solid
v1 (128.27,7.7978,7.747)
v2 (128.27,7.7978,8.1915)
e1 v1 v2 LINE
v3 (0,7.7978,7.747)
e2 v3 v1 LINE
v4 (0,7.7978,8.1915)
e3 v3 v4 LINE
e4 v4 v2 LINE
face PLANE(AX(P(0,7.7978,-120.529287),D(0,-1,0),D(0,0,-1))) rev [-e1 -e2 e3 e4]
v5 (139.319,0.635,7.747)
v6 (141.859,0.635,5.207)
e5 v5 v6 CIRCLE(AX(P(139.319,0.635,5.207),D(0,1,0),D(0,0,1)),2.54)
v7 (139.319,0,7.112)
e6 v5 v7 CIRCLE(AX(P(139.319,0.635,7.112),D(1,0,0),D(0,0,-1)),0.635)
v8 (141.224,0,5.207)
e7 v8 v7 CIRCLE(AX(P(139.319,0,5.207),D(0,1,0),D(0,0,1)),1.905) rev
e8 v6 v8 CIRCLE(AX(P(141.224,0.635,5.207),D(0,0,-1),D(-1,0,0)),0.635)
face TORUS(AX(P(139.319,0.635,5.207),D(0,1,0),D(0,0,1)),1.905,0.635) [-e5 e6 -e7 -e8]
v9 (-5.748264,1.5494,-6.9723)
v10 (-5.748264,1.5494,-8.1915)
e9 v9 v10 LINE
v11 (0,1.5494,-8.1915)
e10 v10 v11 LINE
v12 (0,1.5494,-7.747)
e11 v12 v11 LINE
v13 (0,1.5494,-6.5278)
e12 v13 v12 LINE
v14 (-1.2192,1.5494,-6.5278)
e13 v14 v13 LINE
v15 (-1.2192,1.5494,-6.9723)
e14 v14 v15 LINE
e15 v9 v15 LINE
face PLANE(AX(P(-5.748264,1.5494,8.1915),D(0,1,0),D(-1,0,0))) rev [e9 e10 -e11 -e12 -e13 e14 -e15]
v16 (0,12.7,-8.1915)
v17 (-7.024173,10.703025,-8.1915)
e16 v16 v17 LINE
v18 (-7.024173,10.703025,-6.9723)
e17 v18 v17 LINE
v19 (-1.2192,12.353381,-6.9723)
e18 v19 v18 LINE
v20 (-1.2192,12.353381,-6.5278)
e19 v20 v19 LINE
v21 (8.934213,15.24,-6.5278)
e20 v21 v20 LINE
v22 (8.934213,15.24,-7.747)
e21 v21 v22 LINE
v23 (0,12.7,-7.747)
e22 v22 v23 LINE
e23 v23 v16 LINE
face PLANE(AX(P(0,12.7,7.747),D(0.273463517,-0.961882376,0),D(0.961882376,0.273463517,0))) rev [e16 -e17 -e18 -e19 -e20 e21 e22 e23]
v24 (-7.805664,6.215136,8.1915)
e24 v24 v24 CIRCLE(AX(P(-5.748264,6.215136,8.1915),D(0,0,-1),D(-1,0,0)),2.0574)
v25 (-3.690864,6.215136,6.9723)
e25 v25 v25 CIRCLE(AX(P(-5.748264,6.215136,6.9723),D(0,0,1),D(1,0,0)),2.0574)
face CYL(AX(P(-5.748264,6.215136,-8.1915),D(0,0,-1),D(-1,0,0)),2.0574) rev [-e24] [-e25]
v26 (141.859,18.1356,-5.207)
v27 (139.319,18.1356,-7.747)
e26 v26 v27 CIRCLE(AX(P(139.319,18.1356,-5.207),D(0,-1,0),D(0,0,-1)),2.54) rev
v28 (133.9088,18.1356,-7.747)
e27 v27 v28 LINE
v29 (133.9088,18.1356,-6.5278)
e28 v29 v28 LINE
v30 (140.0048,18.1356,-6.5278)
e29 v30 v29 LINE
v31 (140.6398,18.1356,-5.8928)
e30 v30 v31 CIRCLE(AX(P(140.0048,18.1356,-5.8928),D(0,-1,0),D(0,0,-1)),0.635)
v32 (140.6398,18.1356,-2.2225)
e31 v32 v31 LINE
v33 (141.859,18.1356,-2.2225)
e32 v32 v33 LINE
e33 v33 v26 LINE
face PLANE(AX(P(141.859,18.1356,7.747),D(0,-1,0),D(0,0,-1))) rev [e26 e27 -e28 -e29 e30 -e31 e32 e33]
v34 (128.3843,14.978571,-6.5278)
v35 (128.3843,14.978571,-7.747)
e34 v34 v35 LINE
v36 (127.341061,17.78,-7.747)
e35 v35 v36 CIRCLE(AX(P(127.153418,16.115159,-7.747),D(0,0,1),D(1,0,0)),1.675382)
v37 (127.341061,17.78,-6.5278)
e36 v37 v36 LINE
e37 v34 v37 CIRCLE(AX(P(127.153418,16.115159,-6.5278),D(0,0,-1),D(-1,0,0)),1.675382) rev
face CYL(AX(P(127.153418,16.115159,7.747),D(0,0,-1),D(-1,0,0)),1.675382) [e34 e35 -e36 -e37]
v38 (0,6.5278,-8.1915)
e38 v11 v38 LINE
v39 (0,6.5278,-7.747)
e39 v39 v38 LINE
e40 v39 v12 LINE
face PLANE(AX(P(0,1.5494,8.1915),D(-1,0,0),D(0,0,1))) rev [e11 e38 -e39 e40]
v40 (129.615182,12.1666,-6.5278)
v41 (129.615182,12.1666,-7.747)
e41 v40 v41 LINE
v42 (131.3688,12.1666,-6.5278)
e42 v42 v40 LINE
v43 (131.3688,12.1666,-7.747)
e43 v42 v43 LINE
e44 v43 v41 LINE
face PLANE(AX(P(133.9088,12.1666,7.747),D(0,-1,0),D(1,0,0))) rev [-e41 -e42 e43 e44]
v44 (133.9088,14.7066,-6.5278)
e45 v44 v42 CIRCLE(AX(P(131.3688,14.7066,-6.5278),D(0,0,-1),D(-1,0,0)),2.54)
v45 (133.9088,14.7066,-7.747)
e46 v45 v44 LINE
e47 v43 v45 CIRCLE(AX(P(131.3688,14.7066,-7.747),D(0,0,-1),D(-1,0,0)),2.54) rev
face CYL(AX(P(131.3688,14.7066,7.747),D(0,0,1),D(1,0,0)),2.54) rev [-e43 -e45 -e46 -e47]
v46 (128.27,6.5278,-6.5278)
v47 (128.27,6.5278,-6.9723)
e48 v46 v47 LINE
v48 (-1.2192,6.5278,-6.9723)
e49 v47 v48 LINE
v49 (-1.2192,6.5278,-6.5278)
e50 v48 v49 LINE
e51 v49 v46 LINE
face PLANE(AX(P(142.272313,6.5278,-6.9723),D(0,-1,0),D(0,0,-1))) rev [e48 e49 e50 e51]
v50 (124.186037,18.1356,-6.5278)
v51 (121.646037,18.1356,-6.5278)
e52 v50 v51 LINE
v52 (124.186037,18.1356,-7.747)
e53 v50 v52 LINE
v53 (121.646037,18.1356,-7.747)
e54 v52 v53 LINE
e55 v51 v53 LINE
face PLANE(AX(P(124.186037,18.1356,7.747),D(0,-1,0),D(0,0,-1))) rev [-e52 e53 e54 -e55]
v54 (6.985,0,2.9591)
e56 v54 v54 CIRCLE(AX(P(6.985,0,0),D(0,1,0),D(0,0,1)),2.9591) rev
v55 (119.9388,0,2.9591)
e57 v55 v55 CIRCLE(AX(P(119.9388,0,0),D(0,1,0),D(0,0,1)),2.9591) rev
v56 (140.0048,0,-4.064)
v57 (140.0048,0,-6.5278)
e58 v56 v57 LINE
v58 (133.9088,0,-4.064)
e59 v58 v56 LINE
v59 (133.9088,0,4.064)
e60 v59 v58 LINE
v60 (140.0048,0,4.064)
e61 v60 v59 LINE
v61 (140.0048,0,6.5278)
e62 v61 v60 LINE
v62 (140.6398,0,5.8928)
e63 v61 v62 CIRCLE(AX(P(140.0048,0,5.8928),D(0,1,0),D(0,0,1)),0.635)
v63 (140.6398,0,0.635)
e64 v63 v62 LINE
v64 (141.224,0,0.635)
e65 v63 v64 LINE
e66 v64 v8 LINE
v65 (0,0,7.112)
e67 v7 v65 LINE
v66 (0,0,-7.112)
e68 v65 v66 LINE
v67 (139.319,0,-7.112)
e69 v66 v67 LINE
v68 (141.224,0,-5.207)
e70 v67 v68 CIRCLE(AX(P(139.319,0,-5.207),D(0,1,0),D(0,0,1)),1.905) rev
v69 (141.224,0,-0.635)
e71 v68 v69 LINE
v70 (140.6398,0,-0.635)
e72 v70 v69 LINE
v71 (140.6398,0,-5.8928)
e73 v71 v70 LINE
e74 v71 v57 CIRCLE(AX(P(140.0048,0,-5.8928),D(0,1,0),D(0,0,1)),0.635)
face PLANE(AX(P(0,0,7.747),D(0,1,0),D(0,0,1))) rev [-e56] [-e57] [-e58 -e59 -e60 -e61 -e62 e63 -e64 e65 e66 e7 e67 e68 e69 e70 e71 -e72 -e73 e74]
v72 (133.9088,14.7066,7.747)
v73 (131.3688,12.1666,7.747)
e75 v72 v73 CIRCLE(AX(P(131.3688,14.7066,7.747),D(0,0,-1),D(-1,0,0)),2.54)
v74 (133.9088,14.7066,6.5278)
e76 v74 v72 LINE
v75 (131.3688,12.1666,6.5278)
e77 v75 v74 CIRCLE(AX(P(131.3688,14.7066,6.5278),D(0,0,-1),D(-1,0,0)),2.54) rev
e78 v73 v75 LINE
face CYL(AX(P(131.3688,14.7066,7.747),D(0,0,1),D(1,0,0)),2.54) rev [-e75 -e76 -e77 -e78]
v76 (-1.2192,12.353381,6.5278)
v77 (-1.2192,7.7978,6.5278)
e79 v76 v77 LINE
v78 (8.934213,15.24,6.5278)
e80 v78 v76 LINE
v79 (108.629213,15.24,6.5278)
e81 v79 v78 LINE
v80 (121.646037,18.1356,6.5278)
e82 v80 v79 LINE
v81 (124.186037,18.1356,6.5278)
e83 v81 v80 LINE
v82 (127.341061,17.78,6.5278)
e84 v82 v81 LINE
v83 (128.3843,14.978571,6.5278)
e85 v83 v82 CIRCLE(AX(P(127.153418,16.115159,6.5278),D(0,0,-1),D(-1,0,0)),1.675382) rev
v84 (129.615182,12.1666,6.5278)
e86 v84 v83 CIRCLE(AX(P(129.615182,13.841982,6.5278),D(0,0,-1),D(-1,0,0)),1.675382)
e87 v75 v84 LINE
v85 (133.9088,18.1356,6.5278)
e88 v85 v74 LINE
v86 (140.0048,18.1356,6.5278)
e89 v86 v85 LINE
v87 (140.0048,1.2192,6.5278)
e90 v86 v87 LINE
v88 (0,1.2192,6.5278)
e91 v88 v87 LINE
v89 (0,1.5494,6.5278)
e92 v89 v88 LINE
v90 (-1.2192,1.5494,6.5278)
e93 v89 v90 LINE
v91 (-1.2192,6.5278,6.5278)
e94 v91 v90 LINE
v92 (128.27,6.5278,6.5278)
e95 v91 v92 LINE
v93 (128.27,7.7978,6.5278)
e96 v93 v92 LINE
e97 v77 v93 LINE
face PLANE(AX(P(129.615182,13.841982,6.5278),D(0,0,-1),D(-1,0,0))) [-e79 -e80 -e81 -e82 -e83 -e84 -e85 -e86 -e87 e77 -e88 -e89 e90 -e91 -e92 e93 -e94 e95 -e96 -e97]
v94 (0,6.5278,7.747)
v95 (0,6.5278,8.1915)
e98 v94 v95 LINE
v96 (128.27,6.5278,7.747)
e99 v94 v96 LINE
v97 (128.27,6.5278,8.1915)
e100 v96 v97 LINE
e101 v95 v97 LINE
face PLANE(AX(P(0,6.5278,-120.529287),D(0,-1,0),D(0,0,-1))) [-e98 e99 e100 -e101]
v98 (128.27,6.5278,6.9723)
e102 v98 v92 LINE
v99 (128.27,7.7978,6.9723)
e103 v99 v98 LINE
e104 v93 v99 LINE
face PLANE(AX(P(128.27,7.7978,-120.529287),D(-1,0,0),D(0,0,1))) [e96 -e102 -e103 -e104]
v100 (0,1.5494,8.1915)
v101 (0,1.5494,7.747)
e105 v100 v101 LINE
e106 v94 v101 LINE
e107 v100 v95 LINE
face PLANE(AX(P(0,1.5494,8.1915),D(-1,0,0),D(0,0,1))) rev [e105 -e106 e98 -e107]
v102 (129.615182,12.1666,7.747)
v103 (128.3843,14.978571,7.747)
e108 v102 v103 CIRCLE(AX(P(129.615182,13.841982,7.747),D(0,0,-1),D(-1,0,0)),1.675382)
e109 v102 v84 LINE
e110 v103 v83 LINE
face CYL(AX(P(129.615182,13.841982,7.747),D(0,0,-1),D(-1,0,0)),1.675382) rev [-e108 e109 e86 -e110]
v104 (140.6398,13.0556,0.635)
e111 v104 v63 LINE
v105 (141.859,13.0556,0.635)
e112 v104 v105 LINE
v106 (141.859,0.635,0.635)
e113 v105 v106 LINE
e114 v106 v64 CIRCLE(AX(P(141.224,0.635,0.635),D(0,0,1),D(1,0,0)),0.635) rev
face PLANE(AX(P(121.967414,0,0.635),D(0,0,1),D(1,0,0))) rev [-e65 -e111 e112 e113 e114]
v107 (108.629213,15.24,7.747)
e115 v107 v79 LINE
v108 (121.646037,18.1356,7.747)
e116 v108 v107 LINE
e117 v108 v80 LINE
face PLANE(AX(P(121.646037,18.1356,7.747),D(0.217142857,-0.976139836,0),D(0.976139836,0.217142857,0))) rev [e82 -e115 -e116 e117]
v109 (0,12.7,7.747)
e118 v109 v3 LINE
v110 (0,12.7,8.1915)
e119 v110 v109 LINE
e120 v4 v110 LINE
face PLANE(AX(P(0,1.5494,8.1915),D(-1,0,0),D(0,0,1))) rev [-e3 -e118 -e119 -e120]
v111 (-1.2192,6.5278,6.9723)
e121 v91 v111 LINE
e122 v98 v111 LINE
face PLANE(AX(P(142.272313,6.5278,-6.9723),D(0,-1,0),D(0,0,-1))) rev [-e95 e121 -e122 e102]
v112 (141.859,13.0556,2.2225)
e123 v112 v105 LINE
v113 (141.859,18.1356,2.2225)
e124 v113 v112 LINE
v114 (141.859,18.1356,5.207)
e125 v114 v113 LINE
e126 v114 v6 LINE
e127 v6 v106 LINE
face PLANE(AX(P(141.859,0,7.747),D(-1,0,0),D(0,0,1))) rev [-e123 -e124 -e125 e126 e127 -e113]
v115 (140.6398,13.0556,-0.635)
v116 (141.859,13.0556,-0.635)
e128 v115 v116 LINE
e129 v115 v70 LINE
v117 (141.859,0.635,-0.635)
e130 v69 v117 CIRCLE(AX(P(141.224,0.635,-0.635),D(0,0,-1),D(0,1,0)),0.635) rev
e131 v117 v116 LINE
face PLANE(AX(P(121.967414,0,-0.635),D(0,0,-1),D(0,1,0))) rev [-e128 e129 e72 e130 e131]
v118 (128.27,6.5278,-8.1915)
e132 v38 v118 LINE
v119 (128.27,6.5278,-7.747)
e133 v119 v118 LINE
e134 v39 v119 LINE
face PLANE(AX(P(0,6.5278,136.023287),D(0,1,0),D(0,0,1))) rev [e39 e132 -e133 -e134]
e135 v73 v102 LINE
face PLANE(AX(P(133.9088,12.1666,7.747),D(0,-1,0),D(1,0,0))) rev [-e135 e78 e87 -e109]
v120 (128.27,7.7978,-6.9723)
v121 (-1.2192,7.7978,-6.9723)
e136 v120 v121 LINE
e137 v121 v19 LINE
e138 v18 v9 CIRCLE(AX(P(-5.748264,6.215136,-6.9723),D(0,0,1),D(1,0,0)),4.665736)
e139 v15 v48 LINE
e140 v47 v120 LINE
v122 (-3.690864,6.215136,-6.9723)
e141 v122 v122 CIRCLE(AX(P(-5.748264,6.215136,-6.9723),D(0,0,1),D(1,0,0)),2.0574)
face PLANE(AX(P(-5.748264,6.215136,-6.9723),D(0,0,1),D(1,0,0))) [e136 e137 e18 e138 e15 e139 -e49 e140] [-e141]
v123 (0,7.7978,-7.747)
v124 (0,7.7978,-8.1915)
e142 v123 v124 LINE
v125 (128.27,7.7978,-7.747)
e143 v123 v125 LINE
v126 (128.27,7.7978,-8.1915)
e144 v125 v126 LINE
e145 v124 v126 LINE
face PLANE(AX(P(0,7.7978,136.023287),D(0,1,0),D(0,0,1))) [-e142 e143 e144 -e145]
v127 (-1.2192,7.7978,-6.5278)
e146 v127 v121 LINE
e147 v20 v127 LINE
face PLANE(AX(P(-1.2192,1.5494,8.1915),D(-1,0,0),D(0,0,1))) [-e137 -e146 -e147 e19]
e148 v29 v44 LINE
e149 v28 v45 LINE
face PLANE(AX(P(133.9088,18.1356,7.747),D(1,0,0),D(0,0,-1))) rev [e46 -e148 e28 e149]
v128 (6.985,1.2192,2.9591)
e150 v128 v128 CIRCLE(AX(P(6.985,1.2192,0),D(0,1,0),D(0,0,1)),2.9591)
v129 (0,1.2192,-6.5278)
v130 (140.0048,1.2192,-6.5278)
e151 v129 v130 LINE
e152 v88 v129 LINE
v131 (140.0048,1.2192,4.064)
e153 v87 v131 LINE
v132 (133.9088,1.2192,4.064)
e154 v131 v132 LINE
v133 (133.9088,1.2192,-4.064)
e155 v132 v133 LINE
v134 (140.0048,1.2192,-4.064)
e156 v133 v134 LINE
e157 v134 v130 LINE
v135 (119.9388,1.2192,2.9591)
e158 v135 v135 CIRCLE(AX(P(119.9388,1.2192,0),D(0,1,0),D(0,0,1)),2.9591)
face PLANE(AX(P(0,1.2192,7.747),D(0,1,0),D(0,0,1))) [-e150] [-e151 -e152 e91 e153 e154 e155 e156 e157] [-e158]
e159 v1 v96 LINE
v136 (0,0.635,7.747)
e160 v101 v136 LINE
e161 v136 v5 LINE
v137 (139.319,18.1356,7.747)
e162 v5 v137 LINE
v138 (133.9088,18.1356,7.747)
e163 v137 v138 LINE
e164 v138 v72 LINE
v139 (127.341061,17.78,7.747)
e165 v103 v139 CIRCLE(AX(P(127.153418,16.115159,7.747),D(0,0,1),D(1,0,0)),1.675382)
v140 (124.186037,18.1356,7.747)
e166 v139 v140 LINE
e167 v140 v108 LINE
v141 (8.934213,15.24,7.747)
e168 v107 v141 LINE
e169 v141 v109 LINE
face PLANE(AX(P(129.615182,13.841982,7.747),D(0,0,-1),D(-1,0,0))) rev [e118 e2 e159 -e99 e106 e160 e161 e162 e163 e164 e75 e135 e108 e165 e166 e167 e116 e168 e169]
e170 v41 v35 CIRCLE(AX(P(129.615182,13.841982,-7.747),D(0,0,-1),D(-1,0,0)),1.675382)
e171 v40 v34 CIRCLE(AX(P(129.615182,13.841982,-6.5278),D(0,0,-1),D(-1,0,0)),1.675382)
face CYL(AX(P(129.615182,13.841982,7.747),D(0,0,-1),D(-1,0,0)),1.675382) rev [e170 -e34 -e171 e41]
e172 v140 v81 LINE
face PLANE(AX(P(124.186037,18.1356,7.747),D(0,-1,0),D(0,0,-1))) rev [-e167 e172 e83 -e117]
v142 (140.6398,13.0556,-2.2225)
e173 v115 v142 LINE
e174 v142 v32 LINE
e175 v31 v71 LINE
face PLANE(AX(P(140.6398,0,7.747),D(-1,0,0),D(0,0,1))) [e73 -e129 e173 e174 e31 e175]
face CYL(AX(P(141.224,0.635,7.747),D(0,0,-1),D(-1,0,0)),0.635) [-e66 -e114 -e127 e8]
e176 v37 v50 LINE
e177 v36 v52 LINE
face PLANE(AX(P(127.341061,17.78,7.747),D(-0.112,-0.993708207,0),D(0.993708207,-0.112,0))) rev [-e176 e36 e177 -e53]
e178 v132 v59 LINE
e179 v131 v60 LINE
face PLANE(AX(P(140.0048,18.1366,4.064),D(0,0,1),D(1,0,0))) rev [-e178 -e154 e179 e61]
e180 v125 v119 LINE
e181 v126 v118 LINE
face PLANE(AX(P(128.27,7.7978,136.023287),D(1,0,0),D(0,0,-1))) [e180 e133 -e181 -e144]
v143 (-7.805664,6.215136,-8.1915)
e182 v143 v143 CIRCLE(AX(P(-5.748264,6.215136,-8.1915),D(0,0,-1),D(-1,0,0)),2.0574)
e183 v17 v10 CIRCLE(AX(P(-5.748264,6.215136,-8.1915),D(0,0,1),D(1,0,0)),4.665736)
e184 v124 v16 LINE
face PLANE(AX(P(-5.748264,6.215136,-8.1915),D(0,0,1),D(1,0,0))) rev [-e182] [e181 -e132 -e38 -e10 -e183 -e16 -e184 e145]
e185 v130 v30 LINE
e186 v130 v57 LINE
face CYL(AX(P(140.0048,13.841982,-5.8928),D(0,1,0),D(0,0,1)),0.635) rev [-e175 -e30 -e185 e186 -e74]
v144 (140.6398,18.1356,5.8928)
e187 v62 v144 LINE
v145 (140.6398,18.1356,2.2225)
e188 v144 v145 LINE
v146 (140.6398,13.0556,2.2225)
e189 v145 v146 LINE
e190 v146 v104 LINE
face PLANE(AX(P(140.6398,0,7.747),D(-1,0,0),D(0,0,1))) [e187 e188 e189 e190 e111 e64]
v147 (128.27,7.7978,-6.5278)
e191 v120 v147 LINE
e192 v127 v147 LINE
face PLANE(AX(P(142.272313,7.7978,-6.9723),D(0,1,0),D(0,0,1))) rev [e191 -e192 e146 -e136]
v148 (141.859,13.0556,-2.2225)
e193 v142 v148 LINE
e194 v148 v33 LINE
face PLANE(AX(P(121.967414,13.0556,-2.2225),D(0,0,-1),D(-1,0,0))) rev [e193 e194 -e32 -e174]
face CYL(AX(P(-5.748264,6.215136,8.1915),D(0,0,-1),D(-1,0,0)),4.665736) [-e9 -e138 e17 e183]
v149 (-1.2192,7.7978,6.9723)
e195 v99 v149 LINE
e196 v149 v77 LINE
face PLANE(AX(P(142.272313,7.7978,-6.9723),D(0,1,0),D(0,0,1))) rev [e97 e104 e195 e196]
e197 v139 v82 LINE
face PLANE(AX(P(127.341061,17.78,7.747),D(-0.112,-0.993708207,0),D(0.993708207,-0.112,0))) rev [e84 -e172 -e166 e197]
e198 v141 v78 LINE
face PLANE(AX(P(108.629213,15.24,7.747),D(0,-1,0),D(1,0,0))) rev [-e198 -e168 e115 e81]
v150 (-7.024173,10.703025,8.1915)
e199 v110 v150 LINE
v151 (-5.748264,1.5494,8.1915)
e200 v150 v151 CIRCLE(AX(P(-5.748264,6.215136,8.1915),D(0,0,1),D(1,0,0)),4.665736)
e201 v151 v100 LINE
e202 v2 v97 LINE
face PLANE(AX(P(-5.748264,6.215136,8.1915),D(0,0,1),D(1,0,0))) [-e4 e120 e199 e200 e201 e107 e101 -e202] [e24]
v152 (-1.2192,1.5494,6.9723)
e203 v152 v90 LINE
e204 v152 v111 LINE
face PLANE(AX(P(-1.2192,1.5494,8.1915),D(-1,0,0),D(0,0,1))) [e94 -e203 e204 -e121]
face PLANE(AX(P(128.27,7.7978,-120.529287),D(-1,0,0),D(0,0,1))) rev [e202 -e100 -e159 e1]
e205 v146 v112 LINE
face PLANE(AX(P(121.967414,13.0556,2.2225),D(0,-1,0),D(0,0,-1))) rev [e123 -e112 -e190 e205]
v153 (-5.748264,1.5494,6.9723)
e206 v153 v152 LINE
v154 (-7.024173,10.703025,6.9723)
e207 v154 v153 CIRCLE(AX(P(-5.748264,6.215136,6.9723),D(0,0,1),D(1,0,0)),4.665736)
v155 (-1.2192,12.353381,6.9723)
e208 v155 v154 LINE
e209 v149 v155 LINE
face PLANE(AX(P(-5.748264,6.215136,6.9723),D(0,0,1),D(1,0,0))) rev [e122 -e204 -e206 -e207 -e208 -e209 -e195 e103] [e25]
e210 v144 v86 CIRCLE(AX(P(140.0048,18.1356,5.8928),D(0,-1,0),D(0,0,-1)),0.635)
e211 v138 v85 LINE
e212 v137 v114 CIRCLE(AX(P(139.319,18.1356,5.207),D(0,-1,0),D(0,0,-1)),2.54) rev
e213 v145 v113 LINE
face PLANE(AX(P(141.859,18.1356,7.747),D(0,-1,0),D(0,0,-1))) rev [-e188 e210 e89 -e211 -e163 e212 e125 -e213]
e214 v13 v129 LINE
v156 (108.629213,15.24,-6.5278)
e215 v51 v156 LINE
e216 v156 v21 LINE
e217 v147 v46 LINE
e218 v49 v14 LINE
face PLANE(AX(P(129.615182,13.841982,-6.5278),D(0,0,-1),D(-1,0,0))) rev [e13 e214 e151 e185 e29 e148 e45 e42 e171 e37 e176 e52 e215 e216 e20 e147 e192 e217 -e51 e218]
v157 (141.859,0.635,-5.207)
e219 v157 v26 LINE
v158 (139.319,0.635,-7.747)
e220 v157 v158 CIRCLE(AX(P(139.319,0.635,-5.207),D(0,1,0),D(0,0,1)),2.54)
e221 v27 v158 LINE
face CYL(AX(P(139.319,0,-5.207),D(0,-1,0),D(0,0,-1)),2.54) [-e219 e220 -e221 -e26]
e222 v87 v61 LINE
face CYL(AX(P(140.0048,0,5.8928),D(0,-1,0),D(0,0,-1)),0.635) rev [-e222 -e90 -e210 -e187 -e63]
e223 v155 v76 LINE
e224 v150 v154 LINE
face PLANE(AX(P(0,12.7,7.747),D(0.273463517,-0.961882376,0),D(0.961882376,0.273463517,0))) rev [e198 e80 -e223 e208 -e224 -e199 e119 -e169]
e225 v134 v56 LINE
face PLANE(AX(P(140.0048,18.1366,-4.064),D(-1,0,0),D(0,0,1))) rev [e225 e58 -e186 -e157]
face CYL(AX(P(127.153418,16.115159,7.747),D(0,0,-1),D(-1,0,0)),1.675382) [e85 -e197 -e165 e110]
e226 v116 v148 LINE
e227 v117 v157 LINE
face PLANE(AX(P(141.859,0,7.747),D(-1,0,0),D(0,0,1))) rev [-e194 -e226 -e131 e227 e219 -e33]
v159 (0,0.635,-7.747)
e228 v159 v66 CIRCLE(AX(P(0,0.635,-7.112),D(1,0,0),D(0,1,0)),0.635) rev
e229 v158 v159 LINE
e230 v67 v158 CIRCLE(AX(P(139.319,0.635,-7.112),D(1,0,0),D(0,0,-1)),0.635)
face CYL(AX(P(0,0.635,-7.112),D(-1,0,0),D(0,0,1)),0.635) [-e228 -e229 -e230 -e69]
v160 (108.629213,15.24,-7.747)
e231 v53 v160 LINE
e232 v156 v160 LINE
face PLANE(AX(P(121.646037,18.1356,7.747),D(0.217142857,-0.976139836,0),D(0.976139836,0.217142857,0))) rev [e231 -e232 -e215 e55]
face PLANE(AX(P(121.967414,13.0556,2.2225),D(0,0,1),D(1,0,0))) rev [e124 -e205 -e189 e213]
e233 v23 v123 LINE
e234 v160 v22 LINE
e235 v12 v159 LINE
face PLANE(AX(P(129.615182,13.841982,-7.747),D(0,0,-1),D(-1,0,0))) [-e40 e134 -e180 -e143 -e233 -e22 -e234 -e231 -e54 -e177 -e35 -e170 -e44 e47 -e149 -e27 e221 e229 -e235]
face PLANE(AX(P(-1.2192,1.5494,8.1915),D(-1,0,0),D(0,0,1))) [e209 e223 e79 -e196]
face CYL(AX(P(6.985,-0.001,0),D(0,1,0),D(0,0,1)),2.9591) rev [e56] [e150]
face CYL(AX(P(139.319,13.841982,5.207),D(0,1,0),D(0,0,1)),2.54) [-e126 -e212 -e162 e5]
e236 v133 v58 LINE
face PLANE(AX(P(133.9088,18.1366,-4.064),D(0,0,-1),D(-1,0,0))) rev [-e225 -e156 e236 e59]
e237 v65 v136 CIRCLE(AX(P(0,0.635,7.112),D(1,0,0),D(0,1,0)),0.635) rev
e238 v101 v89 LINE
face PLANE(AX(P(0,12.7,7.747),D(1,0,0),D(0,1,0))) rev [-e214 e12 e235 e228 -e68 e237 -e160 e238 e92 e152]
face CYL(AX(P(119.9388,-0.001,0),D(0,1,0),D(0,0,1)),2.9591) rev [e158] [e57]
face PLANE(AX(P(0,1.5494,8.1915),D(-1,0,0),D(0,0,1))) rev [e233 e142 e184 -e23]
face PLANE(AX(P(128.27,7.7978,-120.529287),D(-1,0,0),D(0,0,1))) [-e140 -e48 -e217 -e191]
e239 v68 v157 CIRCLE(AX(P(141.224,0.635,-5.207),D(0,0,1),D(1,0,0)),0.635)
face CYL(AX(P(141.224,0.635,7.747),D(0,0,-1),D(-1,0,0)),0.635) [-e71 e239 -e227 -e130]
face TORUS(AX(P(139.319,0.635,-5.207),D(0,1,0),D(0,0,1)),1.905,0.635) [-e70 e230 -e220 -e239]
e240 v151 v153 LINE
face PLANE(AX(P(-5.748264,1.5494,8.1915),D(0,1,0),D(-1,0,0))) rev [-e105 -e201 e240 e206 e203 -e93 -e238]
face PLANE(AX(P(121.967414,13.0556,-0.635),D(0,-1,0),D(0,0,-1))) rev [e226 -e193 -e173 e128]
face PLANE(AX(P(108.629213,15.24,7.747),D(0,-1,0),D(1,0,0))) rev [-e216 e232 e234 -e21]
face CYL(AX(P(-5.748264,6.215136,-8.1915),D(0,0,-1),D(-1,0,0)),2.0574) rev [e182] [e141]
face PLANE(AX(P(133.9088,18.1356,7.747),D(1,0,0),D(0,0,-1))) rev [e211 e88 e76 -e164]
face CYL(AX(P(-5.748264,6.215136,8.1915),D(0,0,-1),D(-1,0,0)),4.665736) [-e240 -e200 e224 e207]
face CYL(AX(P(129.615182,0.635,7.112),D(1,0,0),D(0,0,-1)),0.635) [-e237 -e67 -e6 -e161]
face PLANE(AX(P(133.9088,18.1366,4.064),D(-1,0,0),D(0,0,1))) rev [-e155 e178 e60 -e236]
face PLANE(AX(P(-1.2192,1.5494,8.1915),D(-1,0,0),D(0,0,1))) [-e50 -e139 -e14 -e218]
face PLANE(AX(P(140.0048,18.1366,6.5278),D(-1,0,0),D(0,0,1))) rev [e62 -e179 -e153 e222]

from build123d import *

# Parameters (mm, degrees)
BOSS_EXTRUDE1_DEPTH          = 7.747
BOSS_EXTRUDE2_DEPTH          = 8.1915
SHELL1_START                 = 1.2192
SHELL1_DEPTH                 = 16.9164
CUT_EXTRUDE1_DEPTH           = 1.2192
EXTRUDE_THIN1_START          = -16.383
SKETCH4_W                    = 128.27
SKETCH4_H                    = 1.27
EXTRUDE_THIN1_DEPTH          = 16.383
FILLET1_R                    = 2.54
SKETCH5_W                    = 13.9446
SKETCH5_H                    = 1.27
CUT_EXTRUDE2_DEPTH           = 129.4892
F_3_4_0_162_DIAMETER_HOLE1_D = 4.1148
CUT_EXTRUDE3_REACH           = 145.248
FILLET2_DEPTH                = 18.1356
CUT_EXTRUDE4_REACH           = 145.099
SKETCH9_R                    = 2.9591
FILLET3_R                    = 0.635
FILLET4_R                    = 2.54


with BuildPart() as part:
    # Sketch1 → Boss-Extrude1 (new, symmetric)
    with BuildSketch(Plane.XY):
        with BuildLine():
            Line((0, 0), (141.859, 0))
            Line((141.859, 0), (141.859, 18.1356))
            Line((141.859, 18.1356), (133.9088, 18.1356))
            Line((133.9088, 18.1356), (133.9088, 12.1666))
            Line((133.9088, 12.1666), (129.615181762, 12.1666))
            ThreePointArc((129.615181762, 12.1666), (128.080397702, 13.170161892), (128.3843, 14.978570578))
            ThreePointArc((128.3843, 14.978570578), (128.72346749, 16.699838275), (127.341060995, 17.78))
            Line((127.341060995, 17.78), (124.186037439, 18.1356))
            Line((124.186037439, 18.1356), (121.646037439, 18.1356))
            Line((121.646037439, 18.1356), (108.629212725, 15.24))
            Line((108.629212725, 15.24), (8.934212725, 15.24))
            Line((8.934212725, 15.24), (0, 12.7))
            Line((0, 12.7), (0, 0))
        make_face()
    extrude(amount=BOSS_EXTRUDE1_DEPTH, both=True)

    # Sketch2 → Boss-Extrude2 (add, symmetric)
    with BuildSketch(Plane.XY):
        with BuildLine():
            Line((0, 12.7), (-7.024172619, 10.703025112))
            ThreePointArc((-7.024172619, 10.703025112), (-10.369324418, 5.571014033), (-5.748264059, 1.5494))
            Line((-5.748264059, 1.5494), (0, 1.5494))
            Line((0, 1.5494), (0, 12.7))
        make_face()
    extrude(amount=BOSS_EXTRUDE2_DEPTH, both=True)

    # Shell1: read off the stored shape, not the designer's step
    # Shell1 outline → Shell1 (cut)
    with BuildSketch(Plane(origin=(0, 0, 0), x_dir=(1, 0, 0), z_dir=(0, 1, 0)).offset(SHELL1_START)):
        Polygon((140.6398, -6.5278), (140.6398, 6.5278), (-1.2192, 6.5278), (-1.2192, 6.9723), (-12, 6.9723), (-12, -6.9723), (-1.2192, -6.9723), (-1.2192, -6.5278), align=None)
    extrude(amount=SHELL1_DEPTH, mode=Mode.SUBTRACT)

    # Sketch3 → Cut-Extrude1 (cut)
    with BuildSketch(Plane(origin=(141.859, 0, 0), x_dir=(0, 0, -1), z_dir=(1, 0, 0))):
        Polygon((-2.2225, 13.0556), (-0.635, 13.0556), (-0.635, 0), (0.635, 0), (0.635, 13.0556), (2.2225, 13.0556), (2.2225, 18.1356), (-2.2225, 18.1356), align=None)
    extrude(amount=-CUT_EXTRUDE1_DEPTH, mode=Mode.SUBTRACT)

    # Sketch4 → Extrude-Thin1 (add)
    with BuildSketch(Plane.XY.offset(8.1915).offset(EXTRUDE_THIN1_START)):
        with Locations((64.135, 7.1628)):
            Rectangle(SKETCH4_W, SKETCH4_H)
    extrude_thin1 = extrude(amount=EXTRUDE_THIN1_DEPTH)

    # Fillet1
    fillet1_edges = [part.edges().sort_by_distance(p)[0] for p in [
        (141.859, 9.0678, 7.747),
        (141.859, 9.0678, -7.747),
    ]]
    fillet(fillet1_edges, radius=FILLET1_R)

    # Mirror2: Extrude-Thin1 across plane
    add(extrude_thin1.mirror(Plane.XY))

    # Sketch5 → Cut-Extrude2 (cut)
    with BuildSketch(Plane.ZY.offset(1.2192)):
        with Locations((0, 7.1628)):
            Rectangle(SKETCH5_W, SKETCH5_H)
    extrude(amount=-CUT_EXTRUDE2_DEPTH, mode=Mode.SUBTRACT)

    # 3/4 (0.162) Diameter Hole1 (through all)
    with Locations(Plane(origin=(0, 0, -8.1915), x_dir=(-1, 0, 0), z_dir=(0, 0, -1))):
        with Locations((5.748264059, 6.215135941)):
            Hole(F_3_4_0_162_DIAMETER_HOLE1_D / 2)

    # Sketch8 → Cut-Extrude3 (cut, up to next)
    with BuildSketch(Plane.XZ, mode=Mode.PRIVATE) as cut_extrude3_sk1:
        Polygon((140.6398, -6.5278), (140.6398, 6.5278), (140.0048, 6.5278), (140.0048, 4.064), (133.9088, 4.064), (133.9088, -4.064), (140.0048, -4.064), (140.0048, -6.5278), align=None)
    cut_extrude3_tool1 = extrude(cut_extrude3_sk1.sketch, amount=-CUT_EXTRUDE3_REACH, mode=Mode.PRIVATE) & part.part
    add(cut_extrude3_tool1.solids().sort_by_distance((137.439195, 0, 0))[0], mode=Mode.SUBTRACT)

    # Fillet2: read off the stored shape, not the designer's step
    # Fillet2 outline → Fillet2 (add)
    with BuildSketch(Plane(origin=(0, 0, 0), x_dir=(1, 0, 0), z_dir=(0, 1, 0))):
        with BuildLine():
            ThreePointArc((140.0048, 6.5278), (140.453812806, 6.341812806), (140.6398, 5.8928))
            Line((140.6398, 5.8928), (140.6398, 6.5278))
            Line((140.6398, 6.5278), (140.0048, 6.5278))
        make_face()
        with BuildLine():
            Line((140.6398, -6.5278), (140.6398, -5.8928))
            ThreePointArc((140.6398, -5.8928), (140.453812806, -6.341812806), (140.0048, -6.5278))
            Line((140.0048, -6.5278), (140.6398, -6.5278))
        make_face()
    extrude(amount=FILLET2_DEPTH)

    # Sketch9 → Cut-Extrude4 (cut, up to next)
    with BuildSketch(Plane(origin=(0, 1.2192, 0), x_dir=(1, 0, 0), z_dir=(0, 1, 0)), mode=Mode.PRIVATE) as cut_extrude4_sk1:
        with Locations(Location((119.9388, 0, 0), (0, 0, 270))):
            Circle(SKETCH9_R)
    cut_extrude4_tool1 = extrude(cut_extrude4_sk1.sketch, amount=-CUT_EXTRUDE4_REACH, mode=Mode.PRIVATE) & part.part
    # Sketch9 → Cut-Extrude4 (cut, up to next)
    with BuildSketch(Plane(origin=(0, 1.2192, 0), x_dir=(1, 0, 0), z_dir=(0, 1, 0)), mode=Mode.PRIVATE) as cut_extrude4_sk2:
        with Locations(Location((6.985, 0, 0), (0, 0, 270))):
            Circle(SKETCH9_R)
    cut_extrude4_tool2 = extrude(cut_extrude4_sk2.sketch, amount=-CUT_EXTRUDE4_REACH, mode=Mode.PRIVATE) & part.part
    add(cut_extrude4_tool1.solids().sort_by_distance((119.9388, 1.2192, 0))[0], mode=Mode.SUBTRACT)
    add(cut_extrude4_tool2.solids().sort_by_distance((6.985, 1.2192, 0))[0], mode=Mode.SUBTRACT)

    # Fillet3
    fillet3_edges = [part.edges().sort_by_distance(p)[0] for p in [
        (141.859, 0, -2.921),
        (69.6595, 0, -7.747),
        (141.859, 0, 2.921),
        (141.115051224, 0, 7.003051224),
        (141.115051224, 0, -7.003051224),
        (69.6595, 0, 7.747),
    ]]
    fillet(fillet3_edges, radius=FILLET3_R)

    # Fillet4
    fillet4_edges = [part.edges().sort_by_distance(p)[0] for p in [
        (133.9088, 12.1666, 7.1374),
        (133.9088, 12.1666, -7.1374),
    ]]
    fillet(fillet4_edges, radius=FILLET4_R)


solid = part.part
